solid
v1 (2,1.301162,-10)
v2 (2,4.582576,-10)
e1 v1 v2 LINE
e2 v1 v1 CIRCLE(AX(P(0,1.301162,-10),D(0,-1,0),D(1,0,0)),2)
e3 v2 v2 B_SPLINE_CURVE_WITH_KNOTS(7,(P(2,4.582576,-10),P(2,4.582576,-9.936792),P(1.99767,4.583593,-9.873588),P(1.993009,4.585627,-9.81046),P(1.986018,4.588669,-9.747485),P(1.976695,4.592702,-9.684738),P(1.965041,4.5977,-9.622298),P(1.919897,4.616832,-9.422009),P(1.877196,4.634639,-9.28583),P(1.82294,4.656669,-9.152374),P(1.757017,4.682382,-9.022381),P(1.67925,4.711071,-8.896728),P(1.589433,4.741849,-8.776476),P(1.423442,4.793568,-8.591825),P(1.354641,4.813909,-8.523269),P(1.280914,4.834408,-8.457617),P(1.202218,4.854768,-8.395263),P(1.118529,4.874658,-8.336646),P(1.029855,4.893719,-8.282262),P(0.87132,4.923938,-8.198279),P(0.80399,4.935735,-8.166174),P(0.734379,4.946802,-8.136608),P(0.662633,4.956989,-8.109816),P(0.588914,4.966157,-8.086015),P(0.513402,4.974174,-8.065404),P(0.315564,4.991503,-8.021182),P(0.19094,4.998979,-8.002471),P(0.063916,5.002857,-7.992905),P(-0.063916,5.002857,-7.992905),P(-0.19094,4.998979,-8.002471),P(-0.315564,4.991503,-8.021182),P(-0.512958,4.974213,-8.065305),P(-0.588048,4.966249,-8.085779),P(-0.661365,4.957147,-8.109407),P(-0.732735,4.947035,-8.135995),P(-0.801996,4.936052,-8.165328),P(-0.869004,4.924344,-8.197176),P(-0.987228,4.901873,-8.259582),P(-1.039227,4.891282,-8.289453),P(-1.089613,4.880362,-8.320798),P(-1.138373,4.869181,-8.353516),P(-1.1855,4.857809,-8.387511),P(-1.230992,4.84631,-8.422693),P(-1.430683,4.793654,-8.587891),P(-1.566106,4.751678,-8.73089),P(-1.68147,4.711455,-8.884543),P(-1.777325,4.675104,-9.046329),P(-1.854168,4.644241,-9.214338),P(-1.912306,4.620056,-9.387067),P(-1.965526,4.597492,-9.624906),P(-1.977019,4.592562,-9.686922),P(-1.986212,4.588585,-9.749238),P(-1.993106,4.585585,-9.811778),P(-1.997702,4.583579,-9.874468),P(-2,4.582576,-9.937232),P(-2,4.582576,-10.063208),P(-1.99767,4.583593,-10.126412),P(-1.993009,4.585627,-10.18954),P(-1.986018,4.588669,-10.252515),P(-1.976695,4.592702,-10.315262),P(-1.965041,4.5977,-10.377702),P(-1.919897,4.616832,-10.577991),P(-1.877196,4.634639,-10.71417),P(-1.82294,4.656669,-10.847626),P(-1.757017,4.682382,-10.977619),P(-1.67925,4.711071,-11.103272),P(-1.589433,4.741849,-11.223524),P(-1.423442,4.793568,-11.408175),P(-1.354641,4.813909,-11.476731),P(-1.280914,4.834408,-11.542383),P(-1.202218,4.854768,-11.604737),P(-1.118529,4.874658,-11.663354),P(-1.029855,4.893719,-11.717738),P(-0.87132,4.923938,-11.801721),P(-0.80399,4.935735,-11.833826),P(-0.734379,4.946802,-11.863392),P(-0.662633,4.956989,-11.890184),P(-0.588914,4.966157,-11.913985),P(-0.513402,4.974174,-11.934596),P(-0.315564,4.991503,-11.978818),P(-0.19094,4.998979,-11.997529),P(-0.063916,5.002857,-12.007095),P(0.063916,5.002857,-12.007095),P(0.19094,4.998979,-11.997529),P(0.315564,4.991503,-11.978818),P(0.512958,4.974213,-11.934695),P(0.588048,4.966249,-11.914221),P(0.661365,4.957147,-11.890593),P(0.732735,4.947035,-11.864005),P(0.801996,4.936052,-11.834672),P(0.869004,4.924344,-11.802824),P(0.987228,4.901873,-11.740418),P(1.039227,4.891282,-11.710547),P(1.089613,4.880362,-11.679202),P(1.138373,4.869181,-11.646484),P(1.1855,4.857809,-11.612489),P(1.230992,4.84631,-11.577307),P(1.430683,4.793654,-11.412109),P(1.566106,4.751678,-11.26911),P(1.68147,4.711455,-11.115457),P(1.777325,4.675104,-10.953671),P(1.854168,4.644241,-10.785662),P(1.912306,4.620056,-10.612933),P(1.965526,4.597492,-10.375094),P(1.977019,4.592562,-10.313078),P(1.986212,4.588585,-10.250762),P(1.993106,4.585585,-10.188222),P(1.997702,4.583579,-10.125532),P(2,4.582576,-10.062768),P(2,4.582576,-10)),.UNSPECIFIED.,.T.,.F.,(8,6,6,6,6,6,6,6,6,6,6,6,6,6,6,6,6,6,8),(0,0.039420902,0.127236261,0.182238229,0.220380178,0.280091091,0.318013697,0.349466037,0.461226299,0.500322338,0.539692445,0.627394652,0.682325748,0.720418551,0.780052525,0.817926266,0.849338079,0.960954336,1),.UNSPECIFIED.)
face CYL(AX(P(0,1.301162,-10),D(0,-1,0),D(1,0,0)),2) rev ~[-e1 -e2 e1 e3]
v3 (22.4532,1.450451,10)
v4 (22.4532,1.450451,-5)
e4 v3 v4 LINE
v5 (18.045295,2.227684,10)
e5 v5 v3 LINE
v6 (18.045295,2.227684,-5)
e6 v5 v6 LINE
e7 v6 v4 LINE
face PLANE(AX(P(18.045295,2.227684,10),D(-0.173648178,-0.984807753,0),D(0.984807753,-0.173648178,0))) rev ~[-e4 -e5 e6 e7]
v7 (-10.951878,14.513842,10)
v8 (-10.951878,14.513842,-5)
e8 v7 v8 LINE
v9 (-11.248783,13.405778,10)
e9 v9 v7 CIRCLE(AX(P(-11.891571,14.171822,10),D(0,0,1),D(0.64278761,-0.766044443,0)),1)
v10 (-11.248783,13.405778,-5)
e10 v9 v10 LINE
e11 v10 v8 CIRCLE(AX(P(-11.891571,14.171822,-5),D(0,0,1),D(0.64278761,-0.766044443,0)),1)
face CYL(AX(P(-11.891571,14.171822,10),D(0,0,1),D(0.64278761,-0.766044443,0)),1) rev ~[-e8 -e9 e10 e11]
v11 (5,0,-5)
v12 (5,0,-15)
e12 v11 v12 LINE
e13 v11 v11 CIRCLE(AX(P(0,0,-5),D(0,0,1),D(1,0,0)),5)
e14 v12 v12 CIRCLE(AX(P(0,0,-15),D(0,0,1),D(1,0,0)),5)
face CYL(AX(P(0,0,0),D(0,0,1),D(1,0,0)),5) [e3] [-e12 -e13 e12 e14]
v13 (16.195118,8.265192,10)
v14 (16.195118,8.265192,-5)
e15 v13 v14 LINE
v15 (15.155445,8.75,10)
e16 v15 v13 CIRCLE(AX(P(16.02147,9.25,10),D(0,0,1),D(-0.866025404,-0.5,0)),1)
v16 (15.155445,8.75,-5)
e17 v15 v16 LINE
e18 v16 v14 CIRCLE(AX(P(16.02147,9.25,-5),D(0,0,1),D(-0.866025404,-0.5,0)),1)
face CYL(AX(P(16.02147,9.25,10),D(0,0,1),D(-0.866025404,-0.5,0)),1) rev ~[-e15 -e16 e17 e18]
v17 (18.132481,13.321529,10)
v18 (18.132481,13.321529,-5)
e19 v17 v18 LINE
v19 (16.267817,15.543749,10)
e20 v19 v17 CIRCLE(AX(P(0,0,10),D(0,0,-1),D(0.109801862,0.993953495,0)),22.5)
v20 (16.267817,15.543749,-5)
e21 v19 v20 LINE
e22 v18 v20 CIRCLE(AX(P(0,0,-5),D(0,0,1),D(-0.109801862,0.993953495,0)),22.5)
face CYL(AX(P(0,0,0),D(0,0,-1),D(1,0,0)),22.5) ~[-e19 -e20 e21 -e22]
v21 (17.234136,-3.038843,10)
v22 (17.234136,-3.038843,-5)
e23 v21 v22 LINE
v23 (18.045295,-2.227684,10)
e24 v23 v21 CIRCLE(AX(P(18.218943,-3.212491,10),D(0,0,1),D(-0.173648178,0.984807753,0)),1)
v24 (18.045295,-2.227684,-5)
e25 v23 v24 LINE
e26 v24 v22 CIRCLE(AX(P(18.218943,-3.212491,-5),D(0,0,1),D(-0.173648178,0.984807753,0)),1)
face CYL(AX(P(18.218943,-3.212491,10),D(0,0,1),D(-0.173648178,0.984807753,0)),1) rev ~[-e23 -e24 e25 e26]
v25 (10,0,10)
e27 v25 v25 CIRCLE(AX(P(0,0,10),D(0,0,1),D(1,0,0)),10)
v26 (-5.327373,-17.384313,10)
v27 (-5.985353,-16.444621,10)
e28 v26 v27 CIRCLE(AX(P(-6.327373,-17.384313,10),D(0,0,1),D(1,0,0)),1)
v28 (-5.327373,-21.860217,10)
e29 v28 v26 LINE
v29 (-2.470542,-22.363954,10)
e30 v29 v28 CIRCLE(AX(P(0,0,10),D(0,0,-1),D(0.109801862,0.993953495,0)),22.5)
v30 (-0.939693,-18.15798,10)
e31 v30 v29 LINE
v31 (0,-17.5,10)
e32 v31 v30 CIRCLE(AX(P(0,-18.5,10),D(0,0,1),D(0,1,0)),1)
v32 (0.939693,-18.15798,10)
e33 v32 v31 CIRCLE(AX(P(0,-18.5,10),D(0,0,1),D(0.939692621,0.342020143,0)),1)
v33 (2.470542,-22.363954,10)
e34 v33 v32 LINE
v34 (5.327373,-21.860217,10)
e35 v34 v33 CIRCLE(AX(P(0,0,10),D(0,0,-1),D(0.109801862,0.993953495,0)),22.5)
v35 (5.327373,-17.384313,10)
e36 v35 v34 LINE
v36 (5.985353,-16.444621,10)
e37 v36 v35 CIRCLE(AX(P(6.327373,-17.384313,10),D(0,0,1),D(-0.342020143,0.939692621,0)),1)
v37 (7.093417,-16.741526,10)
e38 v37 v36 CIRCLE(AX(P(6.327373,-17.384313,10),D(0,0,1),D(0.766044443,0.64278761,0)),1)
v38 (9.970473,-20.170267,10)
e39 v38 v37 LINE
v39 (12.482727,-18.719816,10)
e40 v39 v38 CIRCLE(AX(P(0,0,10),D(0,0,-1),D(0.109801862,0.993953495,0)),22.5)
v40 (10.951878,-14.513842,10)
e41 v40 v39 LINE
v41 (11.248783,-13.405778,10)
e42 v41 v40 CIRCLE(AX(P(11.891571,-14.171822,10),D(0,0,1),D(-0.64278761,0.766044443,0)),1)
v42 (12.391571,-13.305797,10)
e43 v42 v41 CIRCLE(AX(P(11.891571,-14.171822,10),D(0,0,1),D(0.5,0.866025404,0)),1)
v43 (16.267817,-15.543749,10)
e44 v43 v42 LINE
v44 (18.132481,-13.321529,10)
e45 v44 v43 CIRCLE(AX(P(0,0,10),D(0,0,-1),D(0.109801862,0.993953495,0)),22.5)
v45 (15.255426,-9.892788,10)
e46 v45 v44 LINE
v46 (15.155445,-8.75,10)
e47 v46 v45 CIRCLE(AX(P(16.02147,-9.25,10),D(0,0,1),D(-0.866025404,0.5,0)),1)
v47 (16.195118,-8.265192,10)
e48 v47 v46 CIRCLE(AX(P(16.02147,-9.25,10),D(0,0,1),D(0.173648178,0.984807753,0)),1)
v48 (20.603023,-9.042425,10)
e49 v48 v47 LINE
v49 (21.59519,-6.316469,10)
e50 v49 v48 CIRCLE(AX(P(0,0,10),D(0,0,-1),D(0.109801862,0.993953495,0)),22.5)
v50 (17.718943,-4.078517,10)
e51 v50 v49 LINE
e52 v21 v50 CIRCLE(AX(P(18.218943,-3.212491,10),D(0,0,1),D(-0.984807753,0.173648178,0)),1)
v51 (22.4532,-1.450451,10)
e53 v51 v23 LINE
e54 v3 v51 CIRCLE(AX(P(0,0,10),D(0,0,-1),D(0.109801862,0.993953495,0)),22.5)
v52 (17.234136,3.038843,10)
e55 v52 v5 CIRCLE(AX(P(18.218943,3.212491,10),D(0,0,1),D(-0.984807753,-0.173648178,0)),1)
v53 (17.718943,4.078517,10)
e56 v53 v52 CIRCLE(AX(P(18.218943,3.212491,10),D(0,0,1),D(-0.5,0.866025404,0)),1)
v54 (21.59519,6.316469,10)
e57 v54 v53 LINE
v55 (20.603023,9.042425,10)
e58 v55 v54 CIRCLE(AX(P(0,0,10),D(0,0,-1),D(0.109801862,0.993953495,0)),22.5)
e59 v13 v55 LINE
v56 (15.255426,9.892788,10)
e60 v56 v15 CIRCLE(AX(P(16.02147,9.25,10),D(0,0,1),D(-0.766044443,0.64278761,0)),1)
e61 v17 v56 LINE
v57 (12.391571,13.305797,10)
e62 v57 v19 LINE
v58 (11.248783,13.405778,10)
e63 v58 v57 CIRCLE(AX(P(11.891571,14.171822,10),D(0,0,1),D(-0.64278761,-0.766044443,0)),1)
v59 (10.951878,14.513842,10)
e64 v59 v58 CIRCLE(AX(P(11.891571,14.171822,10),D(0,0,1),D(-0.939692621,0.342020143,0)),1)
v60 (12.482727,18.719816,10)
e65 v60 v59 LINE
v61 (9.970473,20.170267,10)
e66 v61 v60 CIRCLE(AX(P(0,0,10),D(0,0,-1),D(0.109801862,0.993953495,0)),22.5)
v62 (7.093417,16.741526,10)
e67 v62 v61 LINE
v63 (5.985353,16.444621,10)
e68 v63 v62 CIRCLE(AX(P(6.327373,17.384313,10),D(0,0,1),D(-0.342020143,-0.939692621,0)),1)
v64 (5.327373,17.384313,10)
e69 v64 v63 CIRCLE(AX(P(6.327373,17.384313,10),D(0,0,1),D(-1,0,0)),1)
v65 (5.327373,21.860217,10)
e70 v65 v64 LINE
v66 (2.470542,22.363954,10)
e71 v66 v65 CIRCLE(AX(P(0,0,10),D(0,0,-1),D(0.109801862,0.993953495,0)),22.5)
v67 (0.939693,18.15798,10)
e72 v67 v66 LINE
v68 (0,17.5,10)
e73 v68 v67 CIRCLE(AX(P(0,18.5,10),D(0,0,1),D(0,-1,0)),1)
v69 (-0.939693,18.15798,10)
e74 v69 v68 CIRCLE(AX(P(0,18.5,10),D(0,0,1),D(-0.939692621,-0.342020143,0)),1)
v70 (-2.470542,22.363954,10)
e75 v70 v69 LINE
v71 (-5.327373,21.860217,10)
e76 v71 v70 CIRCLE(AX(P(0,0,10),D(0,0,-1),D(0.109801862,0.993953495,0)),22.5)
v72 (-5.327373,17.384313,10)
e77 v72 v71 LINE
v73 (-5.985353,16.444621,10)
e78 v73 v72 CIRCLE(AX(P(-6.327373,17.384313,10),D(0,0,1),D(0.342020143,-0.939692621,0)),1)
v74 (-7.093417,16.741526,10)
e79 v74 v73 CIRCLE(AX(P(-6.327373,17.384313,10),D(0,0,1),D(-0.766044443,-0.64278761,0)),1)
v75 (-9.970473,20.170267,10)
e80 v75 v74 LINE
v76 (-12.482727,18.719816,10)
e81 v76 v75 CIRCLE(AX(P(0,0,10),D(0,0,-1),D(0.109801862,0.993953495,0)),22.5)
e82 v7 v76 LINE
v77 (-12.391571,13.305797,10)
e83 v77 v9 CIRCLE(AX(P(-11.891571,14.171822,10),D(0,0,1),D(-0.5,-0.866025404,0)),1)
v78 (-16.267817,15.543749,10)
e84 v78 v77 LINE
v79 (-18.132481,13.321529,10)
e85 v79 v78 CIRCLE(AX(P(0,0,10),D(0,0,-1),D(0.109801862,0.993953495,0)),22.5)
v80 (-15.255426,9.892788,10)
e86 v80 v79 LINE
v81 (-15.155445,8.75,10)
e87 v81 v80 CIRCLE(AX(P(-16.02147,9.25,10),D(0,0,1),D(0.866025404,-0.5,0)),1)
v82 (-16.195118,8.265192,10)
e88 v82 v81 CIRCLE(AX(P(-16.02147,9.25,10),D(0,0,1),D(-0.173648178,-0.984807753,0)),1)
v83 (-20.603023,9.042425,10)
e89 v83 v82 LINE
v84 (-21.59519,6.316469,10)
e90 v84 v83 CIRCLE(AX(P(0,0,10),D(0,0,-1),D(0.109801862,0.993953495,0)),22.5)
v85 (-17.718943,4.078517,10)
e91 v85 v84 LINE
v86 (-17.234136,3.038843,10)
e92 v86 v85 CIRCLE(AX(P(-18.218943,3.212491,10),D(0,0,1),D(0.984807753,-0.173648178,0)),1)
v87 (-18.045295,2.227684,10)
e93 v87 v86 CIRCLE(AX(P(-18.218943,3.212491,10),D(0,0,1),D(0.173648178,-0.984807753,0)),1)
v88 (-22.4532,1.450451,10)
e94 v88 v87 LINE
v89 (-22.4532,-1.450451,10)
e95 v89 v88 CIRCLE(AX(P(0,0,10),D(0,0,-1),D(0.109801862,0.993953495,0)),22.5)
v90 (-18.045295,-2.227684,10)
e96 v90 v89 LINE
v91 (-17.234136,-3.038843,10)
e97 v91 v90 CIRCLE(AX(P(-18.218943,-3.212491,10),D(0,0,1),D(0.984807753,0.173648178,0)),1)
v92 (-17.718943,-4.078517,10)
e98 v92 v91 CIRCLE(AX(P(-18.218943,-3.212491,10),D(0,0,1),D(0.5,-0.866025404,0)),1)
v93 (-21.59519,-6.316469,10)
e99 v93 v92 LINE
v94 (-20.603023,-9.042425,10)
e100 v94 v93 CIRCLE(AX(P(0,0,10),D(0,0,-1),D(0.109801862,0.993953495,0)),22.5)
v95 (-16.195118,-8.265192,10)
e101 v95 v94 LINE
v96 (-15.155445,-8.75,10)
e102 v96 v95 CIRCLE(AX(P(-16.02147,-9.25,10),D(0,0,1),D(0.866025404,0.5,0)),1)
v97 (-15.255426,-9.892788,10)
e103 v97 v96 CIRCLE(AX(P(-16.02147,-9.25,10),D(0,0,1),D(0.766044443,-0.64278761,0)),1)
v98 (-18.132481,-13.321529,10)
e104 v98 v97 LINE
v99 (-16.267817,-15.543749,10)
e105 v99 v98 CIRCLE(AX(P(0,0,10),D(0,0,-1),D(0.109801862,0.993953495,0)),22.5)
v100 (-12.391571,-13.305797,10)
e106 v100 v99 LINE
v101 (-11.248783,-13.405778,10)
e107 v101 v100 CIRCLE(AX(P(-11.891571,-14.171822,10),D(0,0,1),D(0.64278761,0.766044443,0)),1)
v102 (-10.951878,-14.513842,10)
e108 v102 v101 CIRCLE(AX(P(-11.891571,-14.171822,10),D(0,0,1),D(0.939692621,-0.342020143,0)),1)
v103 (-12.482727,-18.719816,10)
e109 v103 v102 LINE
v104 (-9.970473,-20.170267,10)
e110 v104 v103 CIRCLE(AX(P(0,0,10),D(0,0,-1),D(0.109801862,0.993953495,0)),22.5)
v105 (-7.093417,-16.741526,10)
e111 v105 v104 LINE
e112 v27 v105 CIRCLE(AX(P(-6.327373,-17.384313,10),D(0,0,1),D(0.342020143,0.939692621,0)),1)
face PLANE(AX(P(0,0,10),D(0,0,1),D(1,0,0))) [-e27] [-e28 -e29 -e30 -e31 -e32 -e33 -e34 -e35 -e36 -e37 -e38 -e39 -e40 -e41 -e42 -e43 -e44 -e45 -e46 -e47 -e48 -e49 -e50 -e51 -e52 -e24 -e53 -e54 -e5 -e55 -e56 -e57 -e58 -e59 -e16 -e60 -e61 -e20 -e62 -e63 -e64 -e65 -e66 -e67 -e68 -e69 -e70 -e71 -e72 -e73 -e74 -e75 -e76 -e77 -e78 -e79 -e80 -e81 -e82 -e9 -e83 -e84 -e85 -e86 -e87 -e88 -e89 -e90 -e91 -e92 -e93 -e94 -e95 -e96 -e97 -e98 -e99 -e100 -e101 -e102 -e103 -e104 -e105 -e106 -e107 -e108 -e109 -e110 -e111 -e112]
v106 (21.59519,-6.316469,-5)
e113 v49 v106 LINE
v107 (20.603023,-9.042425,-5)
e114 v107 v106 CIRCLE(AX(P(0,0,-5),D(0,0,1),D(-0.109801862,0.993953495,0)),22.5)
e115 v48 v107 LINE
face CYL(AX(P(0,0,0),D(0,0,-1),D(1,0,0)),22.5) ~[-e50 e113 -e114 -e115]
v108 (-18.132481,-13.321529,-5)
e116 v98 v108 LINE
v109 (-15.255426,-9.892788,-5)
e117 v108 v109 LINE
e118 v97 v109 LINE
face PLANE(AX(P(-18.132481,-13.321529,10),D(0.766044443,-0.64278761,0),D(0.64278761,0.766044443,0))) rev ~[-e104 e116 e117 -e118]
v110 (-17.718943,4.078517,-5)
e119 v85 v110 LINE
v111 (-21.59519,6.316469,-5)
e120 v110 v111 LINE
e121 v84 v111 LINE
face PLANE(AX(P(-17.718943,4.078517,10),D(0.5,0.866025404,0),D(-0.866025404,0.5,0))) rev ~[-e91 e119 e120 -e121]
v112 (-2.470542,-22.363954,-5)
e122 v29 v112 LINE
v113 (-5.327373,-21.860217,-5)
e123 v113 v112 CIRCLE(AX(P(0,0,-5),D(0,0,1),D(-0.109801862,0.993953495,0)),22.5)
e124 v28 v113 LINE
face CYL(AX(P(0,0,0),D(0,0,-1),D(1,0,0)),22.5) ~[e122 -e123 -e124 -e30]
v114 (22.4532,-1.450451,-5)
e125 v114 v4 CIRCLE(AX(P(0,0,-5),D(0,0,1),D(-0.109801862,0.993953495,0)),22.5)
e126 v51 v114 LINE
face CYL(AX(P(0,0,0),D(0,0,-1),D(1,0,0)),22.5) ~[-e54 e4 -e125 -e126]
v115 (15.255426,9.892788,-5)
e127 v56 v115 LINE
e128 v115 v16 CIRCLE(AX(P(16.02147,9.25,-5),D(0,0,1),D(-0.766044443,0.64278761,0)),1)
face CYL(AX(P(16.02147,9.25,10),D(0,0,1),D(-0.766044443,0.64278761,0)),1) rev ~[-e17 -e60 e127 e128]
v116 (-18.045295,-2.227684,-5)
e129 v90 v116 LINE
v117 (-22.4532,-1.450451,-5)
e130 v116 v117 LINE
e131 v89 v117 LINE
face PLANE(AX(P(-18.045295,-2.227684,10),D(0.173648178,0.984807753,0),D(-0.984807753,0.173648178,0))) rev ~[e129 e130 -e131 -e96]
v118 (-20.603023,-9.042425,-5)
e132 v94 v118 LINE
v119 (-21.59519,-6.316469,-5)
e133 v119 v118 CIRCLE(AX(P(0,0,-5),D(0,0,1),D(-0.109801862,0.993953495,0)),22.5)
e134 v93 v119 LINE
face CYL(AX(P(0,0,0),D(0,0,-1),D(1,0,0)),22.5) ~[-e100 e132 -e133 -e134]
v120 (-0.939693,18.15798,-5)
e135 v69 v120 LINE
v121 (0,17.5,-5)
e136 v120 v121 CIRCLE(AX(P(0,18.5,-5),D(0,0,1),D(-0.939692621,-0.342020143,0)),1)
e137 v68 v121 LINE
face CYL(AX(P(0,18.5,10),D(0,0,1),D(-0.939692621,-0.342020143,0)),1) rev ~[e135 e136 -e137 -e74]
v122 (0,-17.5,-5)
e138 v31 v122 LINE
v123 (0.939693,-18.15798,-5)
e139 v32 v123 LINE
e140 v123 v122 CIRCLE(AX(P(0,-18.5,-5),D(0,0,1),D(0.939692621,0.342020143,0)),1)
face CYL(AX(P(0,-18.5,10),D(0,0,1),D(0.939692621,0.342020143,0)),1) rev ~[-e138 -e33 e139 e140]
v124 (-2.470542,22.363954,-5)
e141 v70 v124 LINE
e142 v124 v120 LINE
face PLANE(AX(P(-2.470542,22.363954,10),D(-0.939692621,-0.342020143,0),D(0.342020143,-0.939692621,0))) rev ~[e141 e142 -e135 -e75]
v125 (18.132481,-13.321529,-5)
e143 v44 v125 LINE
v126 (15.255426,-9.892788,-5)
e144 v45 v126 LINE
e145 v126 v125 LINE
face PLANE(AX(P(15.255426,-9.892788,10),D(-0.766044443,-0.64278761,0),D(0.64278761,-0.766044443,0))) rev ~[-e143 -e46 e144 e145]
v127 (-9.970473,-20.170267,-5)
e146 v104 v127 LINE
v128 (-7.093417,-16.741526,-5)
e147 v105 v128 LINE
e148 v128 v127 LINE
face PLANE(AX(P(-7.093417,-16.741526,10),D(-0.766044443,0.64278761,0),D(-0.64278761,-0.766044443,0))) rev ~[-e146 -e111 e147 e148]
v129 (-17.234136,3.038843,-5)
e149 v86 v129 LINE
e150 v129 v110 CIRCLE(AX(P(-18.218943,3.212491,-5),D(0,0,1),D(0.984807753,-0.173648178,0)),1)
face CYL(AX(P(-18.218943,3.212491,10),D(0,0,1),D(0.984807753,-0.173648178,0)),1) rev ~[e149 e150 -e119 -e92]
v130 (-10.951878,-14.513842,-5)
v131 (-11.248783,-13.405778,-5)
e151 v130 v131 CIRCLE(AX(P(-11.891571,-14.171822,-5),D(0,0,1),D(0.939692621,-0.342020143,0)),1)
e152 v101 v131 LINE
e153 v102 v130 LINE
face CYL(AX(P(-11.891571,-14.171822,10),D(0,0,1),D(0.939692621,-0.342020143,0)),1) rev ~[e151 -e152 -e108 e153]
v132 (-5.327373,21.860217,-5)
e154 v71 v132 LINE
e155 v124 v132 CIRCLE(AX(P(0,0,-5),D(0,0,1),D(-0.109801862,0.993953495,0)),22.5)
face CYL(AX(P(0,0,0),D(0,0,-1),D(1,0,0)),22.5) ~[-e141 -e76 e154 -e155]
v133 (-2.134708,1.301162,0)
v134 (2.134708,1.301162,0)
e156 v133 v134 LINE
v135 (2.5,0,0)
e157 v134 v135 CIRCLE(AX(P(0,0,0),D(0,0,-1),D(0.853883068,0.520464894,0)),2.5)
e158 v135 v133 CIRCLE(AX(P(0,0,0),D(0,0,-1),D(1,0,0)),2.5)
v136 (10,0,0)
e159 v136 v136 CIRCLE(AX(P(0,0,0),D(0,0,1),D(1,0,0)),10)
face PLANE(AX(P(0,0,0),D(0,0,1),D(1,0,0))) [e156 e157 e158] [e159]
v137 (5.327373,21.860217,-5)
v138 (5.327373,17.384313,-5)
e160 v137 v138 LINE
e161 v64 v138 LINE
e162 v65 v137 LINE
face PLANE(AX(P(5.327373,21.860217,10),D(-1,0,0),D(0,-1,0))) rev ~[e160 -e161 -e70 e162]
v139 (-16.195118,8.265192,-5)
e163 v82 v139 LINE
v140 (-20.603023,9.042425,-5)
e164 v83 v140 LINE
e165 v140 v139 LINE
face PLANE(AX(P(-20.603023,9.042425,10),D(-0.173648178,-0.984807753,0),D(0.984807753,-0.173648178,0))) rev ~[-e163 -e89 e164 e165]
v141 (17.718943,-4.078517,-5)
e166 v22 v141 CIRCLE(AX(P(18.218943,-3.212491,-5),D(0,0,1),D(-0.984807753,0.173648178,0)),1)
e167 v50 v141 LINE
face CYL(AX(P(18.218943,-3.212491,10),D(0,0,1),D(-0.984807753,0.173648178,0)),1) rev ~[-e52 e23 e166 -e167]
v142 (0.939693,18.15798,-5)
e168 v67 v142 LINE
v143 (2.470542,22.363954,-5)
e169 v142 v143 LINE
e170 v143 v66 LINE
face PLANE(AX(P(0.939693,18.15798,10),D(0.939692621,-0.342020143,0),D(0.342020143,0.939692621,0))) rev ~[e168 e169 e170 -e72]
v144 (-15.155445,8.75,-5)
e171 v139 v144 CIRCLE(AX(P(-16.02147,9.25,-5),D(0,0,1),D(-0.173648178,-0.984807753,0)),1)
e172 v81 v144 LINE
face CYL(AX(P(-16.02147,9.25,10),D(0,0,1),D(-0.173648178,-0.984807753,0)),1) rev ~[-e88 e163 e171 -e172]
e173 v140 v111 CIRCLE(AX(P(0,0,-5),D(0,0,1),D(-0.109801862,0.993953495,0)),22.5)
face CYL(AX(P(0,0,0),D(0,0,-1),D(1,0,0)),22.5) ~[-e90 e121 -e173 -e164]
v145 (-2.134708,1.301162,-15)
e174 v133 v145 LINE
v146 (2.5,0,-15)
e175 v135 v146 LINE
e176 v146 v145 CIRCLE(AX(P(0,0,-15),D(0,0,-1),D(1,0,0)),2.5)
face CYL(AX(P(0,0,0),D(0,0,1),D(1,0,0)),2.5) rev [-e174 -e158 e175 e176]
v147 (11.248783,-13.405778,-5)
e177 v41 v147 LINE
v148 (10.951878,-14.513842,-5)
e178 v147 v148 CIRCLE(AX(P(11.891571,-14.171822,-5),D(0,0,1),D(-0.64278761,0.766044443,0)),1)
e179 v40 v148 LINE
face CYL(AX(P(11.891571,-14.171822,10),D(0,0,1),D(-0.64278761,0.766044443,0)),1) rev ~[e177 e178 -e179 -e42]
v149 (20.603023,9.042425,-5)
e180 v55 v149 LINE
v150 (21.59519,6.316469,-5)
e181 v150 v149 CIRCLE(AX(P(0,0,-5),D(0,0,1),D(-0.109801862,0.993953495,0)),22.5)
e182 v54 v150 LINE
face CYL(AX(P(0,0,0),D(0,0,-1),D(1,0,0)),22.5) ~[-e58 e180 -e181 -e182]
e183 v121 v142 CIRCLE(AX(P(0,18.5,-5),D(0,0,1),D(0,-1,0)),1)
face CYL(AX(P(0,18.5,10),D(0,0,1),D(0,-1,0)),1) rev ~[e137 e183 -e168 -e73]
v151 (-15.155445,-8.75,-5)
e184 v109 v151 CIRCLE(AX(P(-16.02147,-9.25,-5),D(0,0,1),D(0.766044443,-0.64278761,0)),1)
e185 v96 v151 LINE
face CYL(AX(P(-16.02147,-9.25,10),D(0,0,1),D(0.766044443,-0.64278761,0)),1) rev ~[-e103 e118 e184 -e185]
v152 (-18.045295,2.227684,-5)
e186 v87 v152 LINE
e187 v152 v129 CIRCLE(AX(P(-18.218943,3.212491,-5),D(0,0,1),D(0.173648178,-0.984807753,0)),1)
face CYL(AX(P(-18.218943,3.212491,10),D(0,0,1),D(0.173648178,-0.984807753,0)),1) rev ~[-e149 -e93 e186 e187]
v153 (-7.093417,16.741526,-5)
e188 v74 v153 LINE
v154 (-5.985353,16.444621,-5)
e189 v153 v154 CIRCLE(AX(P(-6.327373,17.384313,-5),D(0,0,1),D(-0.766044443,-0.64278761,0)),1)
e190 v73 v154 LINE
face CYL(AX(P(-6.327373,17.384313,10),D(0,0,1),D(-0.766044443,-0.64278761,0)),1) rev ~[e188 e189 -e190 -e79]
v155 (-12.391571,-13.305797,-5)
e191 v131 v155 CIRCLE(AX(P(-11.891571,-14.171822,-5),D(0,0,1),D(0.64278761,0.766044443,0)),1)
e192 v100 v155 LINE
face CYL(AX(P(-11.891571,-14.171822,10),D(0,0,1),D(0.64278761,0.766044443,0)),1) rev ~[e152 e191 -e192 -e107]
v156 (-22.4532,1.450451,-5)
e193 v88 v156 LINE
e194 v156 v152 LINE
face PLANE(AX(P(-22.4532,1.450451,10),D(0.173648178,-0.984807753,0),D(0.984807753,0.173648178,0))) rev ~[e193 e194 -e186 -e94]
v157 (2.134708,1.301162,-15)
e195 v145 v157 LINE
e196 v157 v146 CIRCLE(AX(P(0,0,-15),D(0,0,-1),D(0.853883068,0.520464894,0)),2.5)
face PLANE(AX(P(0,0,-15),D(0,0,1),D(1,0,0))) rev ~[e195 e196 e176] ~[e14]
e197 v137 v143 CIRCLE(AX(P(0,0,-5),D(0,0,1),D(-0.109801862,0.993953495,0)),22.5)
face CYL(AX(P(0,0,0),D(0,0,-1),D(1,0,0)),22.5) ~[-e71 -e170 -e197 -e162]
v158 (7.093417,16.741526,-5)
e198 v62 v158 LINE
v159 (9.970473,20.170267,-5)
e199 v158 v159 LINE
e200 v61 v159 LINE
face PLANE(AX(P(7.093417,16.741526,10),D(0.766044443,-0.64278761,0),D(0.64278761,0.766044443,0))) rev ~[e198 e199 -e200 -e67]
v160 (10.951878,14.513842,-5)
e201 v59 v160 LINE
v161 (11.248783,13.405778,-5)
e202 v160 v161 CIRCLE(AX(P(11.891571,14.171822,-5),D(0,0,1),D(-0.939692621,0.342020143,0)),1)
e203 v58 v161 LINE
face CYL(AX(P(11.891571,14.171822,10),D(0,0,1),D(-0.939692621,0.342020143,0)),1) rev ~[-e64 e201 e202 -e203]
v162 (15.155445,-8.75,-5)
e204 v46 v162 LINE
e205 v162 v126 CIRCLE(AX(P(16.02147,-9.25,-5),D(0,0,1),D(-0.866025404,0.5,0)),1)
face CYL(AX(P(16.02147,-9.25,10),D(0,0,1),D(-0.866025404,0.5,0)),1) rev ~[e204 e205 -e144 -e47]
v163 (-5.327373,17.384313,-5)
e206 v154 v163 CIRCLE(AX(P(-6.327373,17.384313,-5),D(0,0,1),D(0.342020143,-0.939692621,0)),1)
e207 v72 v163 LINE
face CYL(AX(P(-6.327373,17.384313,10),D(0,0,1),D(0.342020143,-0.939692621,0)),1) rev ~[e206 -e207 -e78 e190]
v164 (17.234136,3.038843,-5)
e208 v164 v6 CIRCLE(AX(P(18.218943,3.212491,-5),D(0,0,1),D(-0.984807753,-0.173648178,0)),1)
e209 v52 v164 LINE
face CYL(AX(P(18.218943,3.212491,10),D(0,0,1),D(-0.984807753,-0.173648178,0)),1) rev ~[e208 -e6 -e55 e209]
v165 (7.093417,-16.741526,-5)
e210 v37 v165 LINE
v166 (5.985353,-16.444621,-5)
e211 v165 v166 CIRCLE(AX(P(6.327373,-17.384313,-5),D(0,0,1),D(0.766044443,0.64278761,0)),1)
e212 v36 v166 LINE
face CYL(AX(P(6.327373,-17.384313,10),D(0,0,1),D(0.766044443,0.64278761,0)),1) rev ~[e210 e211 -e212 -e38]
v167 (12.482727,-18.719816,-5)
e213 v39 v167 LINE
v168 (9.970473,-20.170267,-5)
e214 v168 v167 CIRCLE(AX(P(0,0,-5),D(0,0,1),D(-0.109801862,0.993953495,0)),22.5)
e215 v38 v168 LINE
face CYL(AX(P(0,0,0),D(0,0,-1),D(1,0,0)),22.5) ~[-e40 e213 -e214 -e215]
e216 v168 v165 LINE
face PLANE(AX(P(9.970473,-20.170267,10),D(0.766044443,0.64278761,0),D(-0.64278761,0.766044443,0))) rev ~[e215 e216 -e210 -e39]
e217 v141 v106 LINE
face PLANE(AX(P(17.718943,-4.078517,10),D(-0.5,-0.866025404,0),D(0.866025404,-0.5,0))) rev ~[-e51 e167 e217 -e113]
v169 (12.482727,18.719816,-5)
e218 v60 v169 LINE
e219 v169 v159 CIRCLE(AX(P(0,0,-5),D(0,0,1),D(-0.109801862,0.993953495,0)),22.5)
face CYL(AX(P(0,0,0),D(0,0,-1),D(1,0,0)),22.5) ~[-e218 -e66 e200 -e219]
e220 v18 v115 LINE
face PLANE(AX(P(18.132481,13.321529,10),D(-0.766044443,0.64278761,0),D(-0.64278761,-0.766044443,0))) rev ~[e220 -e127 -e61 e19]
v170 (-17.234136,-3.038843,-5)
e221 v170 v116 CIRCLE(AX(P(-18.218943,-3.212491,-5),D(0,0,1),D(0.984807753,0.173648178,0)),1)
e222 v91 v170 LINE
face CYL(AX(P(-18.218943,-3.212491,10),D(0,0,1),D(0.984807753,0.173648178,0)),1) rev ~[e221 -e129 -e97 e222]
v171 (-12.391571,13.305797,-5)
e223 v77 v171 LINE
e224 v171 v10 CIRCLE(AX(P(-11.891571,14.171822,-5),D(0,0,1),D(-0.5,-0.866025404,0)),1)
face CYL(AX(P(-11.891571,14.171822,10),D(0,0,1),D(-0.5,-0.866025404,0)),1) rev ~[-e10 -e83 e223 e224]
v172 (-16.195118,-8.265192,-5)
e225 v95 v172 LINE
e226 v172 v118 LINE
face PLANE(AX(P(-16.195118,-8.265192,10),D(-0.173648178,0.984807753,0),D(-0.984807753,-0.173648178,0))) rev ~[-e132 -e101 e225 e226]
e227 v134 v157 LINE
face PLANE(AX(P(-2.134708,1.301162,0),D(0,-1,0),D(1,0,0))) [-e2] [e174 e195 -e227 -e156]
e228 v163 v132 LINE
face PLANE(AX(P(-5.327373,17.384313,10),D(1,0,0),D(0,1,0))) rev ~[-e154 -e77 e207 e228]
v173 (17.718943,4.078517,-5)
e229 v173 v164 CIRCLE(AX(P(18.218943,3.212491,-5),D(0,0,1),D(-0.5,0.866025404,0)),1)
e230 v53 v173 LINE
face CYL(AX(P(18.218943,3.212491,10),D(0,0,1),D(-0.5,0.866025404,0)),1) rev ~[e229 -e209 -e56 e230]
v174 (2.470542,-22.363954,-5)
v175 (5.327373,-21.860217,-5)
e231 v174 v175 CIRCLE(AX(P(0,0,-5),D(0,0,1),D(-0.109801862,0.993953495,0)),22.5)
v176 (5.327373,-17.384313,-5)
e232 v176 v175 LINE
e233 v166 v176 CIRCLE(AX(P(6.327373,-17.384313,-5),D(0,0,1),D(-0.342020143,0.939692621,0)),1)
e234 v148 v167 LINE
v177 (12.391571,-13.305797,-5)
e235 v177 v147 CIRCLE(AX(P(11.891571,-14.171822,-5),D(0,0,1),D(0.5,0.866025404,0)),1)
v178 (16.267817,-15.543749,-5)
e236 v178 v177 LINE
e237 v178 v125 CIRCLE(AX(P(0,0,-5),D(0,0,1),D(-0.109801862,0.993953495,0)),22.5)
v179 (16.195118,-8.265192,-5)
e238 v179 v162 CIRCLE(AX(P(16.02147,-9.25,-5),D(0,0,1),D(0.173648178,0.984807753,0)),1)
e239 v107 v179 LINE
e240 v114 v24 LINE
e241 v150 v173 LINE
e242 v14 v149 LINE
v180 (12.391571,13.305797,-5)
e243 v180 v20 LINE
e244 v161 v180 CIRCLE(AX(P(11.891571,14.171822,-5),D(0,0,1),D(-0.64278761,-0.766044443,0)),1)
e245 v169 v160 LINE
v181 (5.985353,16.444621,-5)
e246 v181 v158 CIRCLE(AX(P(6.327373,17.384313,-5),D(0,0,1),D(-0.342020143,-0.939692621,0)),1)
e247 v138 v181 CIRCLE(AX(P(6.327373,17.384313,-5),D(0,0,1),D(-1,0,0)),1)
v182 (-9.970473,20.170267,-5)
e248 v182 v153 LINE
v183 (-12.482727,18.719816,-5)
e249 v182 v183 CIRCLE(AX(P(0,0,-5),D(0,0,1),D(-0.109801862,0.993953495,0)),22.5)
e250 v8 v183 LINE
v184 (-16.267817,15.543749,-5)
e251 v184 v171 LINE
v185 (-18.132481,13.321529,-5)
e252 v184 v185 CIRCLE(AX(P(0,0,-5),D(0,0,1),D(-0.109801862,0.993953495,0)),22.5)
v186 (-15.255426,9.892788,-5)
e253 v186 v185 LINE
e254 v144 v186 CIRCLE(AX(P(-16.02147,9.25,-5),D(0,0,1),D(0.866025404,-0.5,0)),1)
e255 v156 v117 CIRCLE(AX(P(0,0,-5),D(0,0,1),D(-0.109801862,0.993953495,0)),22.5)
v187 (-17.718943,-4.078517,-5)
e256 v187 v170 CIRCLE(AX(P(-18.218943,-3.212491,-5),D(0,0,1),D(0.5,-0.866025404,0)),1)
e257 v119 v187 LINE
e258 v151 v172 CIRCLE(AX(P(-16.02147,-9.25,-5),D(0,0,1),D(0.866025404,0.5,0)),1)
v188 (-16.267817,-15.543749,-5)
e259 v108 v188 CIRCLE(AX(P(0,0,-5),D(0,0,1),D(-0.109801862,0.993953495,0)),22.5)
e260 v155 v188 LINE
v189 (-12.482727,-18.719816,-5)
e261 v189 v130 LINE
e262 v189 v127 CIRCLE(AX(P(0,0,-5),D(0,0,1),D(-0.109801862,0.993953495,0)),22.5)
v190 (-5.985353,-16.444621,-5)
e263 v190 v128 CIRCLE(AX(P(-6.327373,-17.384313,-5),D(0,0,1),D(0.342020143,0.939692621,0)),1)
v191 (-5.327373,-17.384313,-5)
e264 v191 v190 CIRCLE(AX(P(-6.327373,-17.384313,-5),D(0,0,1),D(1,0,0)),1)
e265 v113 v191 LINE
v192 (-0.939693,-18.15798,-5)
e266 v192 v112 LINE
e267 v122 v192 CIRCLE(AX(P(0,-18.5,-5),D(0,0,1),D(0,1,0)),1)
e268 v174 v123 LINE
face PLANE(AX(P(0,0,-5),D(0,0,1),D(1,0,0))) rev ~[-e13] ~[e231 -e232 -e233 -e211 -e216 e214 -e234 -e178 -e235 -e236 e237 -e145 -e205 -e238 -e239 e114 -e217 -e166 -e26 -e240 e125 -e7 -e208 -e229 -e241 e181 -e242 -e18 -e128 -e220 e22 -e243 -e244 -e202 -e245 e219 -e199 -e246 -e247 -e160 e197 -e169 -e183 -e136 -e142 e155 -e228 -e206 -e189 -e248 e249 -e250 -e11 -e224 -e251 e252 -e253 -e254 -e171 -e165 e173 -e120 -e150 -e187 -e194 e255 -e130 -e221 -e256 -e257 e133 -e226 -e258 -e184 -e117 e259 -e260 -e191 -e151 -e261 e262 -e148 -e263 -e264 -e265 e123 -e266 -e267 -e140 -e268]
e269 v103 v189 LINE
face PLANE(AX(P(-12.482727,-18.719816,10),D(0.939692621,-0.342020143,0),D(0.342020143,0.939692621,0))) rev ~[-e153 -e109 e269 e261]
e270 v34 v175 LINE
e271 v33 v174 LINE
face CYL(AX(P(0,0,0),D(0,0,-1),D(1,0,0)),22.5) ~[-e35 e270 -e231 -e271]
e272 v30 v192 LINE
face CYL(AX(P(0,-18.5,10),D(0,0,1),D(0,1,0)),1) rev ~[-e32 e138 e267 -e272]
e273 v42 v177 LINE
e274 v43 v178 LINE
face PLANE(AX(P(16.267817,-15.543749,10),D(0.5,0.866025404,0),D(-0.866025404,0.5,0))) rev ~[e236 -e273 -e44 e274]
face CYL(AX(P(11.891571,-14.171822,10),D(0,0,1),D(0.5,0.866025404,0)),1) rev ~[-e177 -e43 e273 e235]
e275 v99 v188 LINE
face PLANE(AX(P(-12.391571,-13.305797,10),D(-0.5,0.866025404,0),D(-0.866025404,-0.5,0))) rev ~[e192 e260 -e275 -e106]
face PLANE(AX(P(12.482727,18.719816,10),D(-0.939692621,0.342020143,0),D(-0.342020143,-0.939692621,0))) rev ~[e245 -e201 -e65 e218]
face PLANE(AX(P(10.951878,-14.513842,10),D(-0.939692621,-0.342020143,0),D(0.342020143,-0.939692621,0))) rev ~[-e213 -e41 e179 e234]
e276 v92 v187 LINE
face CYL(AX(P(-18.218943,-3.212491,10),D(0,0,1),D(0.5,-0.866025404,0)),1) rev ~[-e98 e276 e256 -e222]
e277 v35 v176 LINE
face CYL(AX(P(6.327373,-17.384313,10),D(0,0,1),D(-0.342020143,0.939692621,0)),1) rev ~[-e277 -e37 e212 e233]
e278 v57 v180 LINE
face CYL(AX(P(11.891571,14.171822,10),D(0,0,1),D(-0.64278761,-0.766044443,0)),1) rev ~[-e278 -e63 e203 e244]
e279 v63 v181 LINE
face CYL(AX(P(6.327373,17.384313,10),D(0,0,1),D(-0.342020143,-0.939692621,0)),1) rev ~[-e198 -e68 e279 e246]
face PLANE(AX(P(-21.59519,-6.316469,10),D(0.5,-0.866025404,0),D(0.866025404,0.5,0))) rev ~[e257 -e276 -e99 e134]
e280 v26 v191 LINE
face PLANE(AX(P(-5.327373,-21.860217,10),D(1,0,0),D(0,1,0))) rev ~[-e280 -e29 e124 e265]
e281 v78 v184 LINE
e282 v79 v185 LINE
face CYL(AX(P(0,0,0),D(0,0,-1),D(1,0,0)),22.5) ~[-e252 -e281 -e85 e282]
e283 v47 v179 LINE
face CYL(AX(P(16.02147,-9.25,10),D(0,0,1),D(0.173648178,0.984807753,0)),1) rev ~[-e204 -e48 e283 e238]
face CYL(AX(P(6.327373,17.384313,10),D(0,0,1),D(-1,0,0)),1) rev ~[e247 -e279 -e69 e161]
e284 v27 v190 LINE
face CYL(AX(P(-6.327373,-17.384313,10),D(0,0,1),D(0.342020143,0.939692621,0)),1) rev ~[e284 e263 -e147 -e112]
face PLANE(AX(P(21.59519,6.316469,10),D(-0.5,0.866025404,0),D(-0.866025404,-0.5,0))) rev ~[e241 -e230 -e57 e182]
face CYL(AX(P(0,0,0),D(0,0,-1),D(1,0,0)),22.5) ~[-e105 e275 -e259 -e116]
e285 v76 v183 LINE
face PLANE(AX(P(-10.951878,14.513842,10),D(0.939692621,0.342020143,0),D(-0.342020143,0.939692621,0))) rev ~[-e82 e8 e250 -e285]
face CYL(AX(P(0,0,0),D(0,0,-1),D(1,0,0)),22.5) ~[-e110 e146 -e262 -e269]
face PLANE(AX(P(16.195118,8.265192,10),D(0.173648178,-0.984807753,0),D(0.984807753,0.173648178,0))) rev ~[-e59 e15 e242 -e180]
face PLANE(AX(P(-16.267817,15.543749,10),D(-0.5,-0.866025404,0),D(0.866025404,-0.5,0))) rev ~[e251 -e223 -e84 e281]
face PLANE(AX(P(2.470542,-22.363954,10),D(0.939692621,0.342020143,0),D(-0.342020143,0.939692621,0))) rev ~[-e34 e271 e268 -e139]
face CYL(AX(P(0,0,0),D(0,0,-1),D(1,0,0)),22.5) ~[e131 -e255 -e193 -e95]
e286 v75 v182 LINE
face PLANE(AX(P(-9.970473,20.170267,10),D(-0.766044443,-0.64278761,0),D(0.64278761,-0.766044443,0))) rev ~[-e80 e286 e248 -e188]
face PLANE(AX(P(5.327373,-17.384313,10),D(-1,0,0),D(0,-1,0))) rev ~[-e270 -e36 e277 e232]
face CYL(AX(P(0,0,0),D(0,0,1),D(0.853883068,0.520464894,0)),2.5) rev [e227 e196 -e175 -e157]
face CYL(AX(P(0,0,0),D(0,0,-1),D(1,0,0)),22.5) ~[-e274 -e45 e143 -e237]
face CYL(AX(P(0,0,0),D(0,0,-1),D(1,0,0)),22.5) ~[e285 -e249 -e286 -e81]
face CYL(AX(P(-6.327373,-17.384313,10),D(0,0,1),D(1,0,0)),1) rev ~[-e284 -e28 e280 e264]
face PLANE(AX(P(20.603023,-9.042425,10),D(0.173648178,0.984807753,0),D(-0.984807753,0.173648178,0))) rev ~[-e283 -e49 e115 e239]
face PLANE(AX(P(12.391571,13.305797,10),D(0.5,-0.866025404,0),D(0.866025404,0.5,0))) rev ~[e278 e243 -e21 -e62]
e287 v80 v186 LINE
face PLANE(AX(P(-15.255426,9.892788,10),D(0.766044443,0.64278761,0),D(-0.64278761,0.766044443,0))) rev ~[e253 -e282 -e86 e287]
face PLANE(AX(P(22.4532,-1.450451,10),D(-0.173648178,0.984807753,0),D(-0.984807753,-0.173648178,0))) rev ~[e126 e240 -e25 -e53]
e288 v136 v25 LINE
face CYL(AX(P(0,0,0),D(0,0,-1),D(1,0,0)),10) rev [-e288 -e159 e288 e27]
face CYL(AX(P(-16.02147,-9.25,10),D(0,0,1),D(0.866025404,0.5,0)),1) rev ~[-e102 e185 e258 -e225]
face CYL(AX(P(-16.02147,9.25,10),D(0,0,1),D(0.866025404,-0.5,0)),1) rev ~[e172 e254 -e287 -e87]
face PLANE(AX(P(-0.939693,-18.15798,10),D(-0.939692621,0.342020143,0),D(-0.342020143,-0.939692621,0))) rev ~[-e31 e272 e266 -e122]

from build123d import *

# Parameters (mm, degrees)
F0_R            = 10
F0_R_2          = 5
F1_DEPTH        = 5
F2_DEPTH        = 15
F3_R            = 2
F4_DEPTH        = 8.6998377653
F0_R_3          = 22.5
F0_R_4          = 17.5
F5_DEPTH        = 5
F6_DEPTH        = 10
F8_DEPTH        = 25.0010001
F8_COPIES_COUNT = 18


# Not quite as in the source:
# - a feature of the source that left no trace in its solid (it failed there, or was rolled back) is left out
# - a pattern or mirror of a feature is missing from the dataset's text; its kind, count and spacing are read off the source's solid


with BuildPart() as f1:
    # F0 (on Top) → F1 (new body)
    with BuildSketch(Plane.XY):
        Circle(F0_R)
        Circle(F0_R_2, mode=Mode.SUBTRACT)
    extrude(amount=-F1_DEPTH)

    # F0 (on Top) → F2 (join)
    with BuildSketch(Plane.XY):
        Circle(F0_R_2)
        with BuildLine():
            ThreePointArc((2.1347076706, 1.3011622347), (2.4069450738, 0.6757332401), (2.5, 0))
            ThreePointArc((2.5, 0), (-0.6757332401, -2.4069450738), (-2.1347076706, 1.3011622347))
            ThreePointArc((-2.1347076706, 1.3011622347), (0, 2.5), (2.1347076706, 1.3011622347))
        make_face(mode=Mode.SUBTRACT)
        with BuildLine():
            Line((-2.1347076706, 1.3011622347), (2.1347076706, 1.3011622347))
            ThreePointArc((2.1347076706, 1.3011622347), (0, 2.5), (-2.1347076706, 1.3011622347))
        make_face()
    extrude(amount=-F2_DEPTH)

    # F3 (on face) → F4 (cut, through all)
    with BuildSketch(Plane.XZ.offset(-1.3011622347)):
        with Locations((0, -10)):
            Circle(F3_R)
    extrude(amount=-F4_DEPTH, mode=Mode.SUBTRACT)

    # F0 (on Top) → F5 (join)
    with BuildSketch(Plane.XY):
        Circle(F0_R_3)
        Circle(F0_R_4, mode=Mode.SUBTRACT)
        Circle(F0_R_4)
        Circle(F0_R, mode=Mode.SUBTRACT)
    extrude(amount=-F5_DEPTH)

    # F0 (on Top) → F6 (join)
    with BuildSketch(Plane.XY):
        Circle(F0_R_3)
        Circle(F0_R_4, mode=Mode.SUBTRACT)
        Circle(F0_R_4)
        Circle(F0_R, mode=Mode.SUBTRACT)
    extrude(amount=F6_DEPTH)

    # F7 (on face) → F8 (cut, through all)
    with BuildSketch(Plane.XY.offset(10)):
        with BuildLine():
            Line((0.9396926208, 18.1579798567), (2.470541887, 22.3639536483))
            ThreePointArc((2.470541887, 22.3639536483), (0, 22.5), (-2.470541887, 22.3639536483))
            Line((-2.470541887, 22.3639536483), (-0.9396926208, 18.1579798567))
            ThreePointArc((-0.9396926208, 18.1579798567), (-0.5735764364, 17.6808479557), (0, 17.5))
            ThreePointArc((0, 17.5), (0.5735764364, 17.6808479557), (0.9396926208, 18.1579798567))
        make_face()
    f8 = extrude(amount=-F8_DEPTH, mode=Mode.SUBTRACT)

    # F8_copies: F8 ×18 about axis
    f8_copies_axis = Axis((0, 0, 0), (0, 0, 1))
    for i in range(1, F8_COPIES_COUNT):
        add(f8.rotate(f8_copies_axis, i * 360 / F8_COPIES_COUNT), mode=Mode.SUBTRACT)


solid = f1.part
